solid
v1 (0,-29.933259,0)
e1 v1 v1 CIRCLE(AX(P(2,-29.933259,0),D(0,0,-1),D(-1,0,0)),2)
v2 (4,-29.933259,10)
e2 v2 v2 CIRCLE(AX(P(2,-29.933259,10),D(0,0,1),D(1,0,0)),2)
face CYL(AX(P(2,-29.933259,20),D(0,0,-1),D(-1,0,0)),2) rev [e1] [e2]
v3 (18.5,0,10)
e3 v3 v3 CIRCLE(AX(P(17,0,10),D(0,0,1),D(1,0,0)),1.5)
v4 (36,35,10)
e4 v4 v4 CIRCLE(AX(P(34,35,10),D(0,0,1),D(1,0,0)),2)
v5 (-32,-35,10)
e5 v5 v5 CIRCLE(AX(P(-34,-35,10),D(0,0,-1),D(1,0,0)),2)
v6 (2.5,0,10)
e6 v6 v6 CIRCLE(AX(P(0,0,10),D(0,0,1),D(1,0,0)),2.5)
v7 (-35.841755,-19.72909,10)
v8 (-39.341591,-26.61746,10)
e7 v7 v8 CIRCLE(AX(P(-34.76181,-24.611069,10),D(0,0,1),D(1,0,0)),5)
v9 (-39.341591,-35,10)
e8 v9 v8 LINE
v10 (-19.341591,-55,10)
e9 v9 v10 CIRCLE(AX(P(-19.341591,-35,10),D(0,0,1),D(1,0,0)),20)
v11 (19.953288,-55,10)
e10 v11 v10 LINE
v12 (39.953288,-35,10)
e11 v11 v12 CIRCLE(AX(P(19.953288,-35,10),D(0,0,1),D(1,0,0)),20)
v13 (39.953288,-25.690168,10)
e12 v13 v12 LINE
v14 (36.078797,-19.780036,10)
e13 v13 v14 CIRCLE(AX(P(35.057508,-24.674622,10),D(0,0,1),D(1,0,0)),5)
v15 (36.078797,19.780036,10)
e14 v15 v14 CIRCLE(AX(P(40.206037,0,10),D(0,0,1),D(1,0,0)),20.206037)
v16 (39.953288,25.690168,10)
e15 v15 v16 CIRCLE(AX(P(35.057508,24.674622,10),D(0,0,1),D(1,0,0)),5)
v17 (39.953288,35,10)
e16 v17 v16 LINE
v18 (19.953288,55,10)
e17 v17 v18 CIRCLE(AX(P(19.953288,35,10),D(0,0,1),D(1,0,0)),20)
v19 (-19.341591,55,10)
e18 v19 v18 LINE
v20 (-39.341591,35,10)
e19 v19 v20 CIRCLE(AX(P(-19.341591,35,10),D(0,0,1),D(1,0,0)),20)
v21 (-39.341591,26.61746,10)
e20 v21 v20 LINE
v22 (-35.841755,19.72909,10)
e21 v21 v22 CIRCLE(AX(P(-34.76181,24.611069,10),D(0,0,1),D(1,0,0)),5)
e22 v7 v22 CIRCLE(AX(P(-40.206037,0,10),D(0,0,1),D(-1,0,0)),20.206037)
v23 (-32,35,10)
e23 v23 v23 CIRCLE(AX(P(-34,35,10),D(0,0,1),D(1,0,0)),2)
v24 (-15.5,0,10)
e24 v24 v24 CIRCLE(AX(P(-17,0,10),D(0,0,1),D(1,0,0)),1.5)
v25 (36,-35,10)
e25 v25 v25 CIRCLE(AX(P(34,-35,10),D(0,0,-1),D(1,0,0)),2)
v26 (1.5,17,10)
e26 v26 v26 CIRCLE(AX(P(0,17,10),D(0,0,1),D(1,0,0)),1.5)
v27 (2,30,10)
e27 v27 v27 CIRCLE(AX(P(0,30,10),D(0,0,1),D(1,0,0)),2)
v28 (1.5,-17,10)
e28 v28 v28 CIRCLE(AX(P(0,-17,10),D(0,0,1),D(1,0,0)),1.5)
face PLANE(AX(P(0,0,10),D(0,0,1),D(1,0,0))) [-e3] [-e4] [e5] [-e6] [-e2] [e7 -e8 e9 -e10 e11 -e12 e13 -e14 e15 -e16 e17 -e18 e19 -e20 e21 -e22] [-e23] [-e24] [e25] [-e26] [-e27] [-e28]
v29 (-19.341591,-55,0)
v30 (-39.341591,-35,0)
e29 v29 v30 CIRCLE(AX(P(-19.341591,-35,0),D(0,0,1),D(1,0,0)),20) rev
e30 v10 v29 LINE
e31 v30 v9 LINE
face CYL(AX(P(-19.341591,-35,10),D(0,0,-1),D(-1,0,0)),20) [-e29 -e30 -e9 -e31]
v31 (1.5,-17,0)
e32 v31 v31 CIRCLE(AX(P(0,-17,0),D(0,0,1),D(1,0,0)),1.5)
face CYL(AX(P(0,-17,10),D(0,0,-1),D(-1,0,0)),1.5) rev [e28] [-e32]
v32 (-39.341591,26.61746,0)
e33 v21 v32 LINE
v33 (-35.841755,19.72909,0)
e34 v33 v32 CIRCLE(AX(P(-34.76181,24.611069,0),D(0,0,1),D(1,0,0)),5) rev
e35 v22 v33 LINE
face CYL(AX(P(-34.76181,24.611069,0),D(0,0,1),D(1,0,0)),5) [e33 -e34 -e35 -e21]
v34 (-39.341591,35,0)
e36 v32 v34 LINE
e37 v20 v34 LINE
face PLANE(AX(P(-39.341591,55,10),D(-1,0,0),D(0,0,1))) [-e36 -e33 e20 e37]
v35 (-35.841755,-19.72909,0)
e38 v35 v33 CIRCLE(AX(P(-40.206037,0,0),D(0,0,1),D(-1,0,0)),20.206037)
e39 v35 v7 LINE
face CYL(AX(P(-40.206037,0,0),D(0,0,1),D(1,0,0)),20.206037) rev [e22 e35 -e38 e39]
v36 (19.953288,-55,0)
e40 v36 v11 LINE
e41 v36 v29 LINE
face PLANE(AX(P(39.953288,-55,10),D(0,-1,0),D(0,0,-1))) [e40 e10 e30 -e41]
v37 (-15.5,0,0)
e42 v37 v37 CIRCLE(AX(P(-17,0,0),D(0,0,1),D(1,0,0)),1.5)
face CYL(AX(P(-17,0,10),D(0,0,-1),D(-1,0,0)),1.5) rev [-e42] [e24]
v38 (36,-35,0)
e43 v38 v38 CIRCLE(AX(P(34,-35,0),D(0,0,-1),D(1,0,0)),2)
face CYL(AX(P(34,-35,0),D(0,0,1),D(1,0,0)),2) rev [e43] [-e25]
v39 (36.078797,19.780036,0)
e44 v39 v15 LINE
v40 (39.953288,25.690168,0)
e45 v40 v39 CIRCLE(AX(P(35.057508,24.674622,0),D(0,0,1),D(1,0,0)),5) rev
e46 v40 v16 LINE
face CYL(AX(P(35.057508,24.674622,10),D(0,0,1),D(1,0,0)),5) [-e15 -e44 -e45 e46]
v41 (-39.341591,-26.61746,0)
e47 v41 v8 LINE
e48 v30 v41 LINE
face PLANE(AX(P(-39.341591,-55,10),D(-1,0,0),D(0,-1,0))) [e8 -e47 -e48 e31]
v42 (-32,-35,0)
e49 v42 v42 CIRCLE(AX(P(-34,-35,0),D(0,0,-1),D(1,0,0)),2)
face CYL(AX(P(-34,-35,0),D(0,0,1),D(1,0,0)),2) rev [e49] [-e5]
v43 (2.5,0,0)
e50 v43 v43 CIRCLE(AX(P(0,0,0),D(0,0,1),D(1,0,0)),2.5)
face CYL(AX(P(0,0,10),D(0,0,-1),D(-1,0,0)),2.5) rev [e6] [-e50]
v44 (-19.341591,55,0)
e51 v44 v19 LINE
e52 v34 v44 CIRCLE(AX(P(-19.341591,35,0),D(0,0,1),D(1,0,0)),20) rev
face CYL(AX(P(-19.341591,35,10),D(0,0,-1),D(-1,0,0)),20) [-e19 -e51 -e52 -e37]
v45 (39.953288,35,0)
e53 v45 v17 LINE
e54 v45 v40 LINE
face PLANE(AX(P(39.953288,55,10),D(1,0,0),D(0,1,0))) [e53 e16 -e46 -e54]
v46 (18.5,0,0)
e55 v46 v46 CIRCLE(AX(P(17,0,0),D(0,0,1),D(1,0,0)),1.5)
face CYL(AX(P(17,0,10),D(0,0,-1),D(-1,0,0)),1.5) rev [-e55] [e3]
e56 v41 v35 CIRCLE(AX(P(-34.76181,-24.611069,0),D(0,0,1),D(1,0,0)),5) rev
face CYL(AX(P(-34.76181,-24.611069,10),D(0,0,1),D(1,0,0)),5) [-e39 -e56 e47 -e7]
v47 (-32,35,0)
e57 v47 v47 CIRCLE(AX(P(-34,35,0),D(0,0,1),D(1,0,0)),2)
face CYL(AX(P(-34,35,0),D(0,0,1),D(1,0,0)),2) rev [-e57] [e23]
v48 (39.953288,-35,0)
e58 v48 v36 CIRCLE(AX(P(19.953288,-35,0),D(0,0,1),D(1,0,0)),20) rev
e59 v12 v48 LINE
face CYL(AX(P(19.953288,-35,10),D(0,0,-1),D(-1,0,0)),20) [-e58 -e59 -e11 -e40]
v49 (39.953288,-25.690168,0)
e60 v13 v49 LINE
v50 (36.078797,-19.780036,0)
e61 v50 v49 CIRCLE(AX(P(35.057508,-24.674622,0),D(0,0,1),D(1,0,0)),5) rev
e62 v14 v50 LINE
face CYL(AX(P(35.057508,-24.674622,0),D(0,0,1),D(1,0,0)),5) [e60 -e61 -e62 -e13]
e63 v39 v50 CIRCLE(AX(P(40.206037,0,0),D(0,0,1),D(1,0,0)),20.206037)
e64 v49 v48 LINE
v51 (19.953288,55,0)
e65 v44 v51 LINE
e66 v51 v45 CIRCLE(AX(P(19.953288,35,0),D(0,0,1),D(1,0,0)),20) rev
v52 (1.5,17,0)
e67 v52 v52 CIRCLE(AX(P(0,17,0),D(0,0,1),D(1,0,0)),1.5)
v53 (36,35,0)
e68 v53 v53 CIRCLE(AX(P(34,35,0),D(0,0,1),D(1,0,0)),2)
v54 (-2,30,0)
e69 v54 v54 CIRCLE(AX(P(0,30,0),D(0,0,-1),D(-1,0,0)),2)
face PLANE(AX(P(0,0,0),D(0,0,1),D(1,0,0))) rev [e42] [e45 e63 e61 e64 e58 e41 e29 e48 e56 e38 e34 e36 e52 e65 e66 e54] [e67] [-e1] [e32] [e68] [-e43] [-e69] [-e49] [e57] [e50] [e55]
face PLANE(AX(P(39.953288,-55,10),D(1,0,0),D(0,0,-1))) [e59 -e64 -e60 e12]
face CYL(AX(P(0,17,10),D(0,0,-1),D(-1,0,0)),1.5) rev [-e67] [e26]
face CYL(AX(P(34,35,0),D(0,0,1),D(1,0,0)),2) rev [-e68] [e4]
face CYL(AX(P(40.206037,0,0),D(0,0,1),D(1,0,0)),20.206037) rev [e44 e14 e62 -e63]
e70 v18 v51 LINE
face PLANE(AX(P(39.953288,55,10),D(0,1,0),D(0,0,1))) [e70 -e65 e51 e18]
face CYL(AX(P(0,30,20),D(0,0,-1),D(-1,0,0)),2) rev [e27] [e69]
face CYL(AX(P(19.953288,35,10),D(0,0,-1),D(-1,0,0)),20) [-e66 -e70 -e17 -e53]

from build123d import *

# Parameters (mm, degrees)
SKETCH1_R           = 47.5
SKETCH1_R_2         = 2.5
SKETCH1_R_3         = 1.5
BOSS_EXTRUDE1_DEPTH = 10
SKETCH7_W           = 79.294879448
SKETCH7_H           = 30
BOSS_EXTRUDE3_DEPTH = 10
SKETCH3_R           = 2
CUT_EXTRUDE1_DEPTH  = 10
CUT_EXTRUDE2_START  = -10
CUT_EXTRUDE2_DEPTH  = 10
FILLET2_R           = 5
FILLET3_R           = 20
SKETCH8_R           = 2
CUT_EXTRUDE3_DEPTH  = 20


with BuildPart() as part:
    # Sketch1 → Boss-Extrude1 (new body)
    with BuildSketch(Plane.XY):
        Circle(SKETCH1_R)
        Circle(SKETCH1_R_2, mode=Mode.SUBTRACT)
        with Locations((0, 17)):
            Circle(SKETCH1_R_3, mode=Mode.SUBTRACT)
        with Locations((17, 0)):
            Circle(SKETCH1_R_3, mode=Mode.SUBTRACT)
        with Locations((0, -17)):
            Circle(SKETCH1_R_3, mode=Mode.SUBTRACT)
        with Locations((-17, 0)):
            Circle(SKETCH1_R_3, mode=Mode.SUBTRACT)
    extrude(amount=BOSS_EXTRUDE1_DEPTH)

    # Sketch7 → Boss-Extrude3 (add)
    with BuildSketch(Plane(origin=(0, 0, 0), x_dir=(-1, 0, 0), z_dir=(0, 0, -1))):
        with Locations((-0.305848536, 40)):
            Rectangle(SKETCH7_W, SKETCH7_H)
        with Locations((-0.305848536, -40)):
            Rectangle(SKETCH7_W, SKETCH7_H)
    extrude(amount=-BOSS_EXTRUDE3_DEPTH)

    # Sketch3 → Cut-Extrude1 (cut)
    with BuildSketch(Plane.XY.offset(10)):
        with Locations((-34, 35)):
            Circle(SKETCH3_R)
        with Locations((34, 35)):
            Circle(SKETCH3_R)
    cut_extrude1 = extrude(amount=-CUT_EXTRUDE1_DEPTH, mode=Mode.SUBTRACT)

    # Mirror1: Cut-Extrude1 across plane
    add(cut_extrude1.mirror(Plane.ZX), mode=Mode.SUBTRACT)

    # Sketch4 → Cut-Extrude2 (cut)
    with BuildSketch(Plane.XY.offset(10).offset(CUT_EXTRUDE2_START)):
        with BuildLine():
            ThreePointArc((-43.084219849, 20), (-47.5, 0), (-43.084219849, -20))
            ThreePointArc((-43.084219849, -20), (-20, 0), (-43.084219849, 20))
        make_face()
        with BuildLine():
            ThreePointArc((43.084219849, 20), (47.5, 0), (43.084219849, -20))
            ThreePointArc((43.084219849, -20), (20, 0), (43.084219849, 20))
        make_face()
    extrude(amount=CUT_EXTRUDE2_DEPTH, mode=Mode.SUBTRACT)

    # Fillet2
    # the kernel refuses this fillet: 5 mm, written as the material it takes off along each edge
    with BuildSketch(Plane(origin=(43.084219849, -20, -17.522188683), x_dir=(-0.4820770193525399, -0.8761288417876509, 0), z_dir=(0, 0, 1))) as fillet2_piece_1:
        with BuildLine():
            CenterArc((7.965064209, -4.7789061), FILLET2_R, 107.102298128, 89.932791817)
            Line((3.18443662, -6.243692723), (3.088824068, -6.272988455))
            ThreePointArc((3.088824068, -6.272988455), (1.775921643, -3.02815315), (-0.079852724, -0.060195867))
            Line((-0.079852724, -0.060195867), (-0.006836496, 0.099766038))
            ThreePointArc((-0.006836496, 0.099766038), (3.24733545, 0.211131977), (6.465263034, 0.095578122))
            Line((6.465263034, 0.095578122), (6.4946709, 0))
        make_face()
    extrude(amount=45.044377366, mode=Mode.SUBTRACT)
    with BuildSketch(Plane(origin=(43.084219849, 20, -17.522188683), x_dir=(-0.9995074123131517, -0.03138363795144594, 0), z_dir=(0, 0, 1))) as fillet2_piece_2:
        with BuildLine():
            CenterArc((7.876051386, -4.92422643), FILLET2_R, 99.987608256, 89.932791817)
            Line((2.950811143, -5.78562561), (2.852306338, -5.802853594))
            ThreePointArc((2.852306338, -5.802853594), (1.28732359, -2.988739235), (-0.091980358, -0.039237913))
            Line((-0.091980358, -0.039237913), (0.017343518, 0.098484529))
            ThreePointArc((0.017343518, 0.098484529), (3.504437737, -0.206216713), (6.991531955, 0.098484529))
            Line((6.991531955, 0.098484529), (7.008875473, 0))
        make_face()
    extrude(amount=45.044377366, mode=Mode.SUBTRACT)
    with BuildSketch(Plane(origin=(-43.084219849, 20, -19.006257622), x_dir=(0.9993011358017984, -0.037379673423339595, 0), z_dir=(0, 0, 1))) as fillet2_piece_3:
        with BuildLine():
            CenterArc((8.144232965, 4.918935136), FILLET2_R, 158.484077447, 101.184563019)
            Line((3.49265456, 6.752734019), (3.399622992, 6.789409997))
            ThreePointArc((3.399622992, 6.789409997), (1.522188613, 3.492296192), (-0.092214112, 0.038685366))
            Line((-0.092214112, 0.038685366), (0.01793407, -0.098378703))
            ThreePointArc((0.01793407, -0.098378703), (3.623764745, 0.227599929), (7.22959542, -0.098378703))
            Line((7.22959542, -0.098378703), (7.247529489, 0))
        make_face()
    extrude(amount=48.012515244, mode=Mode.SUBTRACT)
    with BuildSketch(Plane(origin=(-43.084219849, -20, -19.006257622), x_dir=(0.4922890050047702, -0.8704318098228104, 0), z_dir=(0, 0, 1))) as fillet2_piece_4:
        with BuildLine():
            CenterArc((8.110651537, 4.97411149), FILLET2_R, 162.982413534, 101.184563019)
            Line((3.329576688, 6.437437594), (3.233955191, 6.466704116))
            ThreePointArc((3.233955191, 6.466704116), (1.866948313, 3.114157454), (-0.079143369, 0.061125503))
            Line((-0.079143369, 0.061125503), (-0.008002635, -0.099679275))
            ThreePointArc((-0.008002635, -0.099679275), (3.801251524, -0.252344442), (7.592340079, -0.09948223))
            Line((7.592340079, -0.09948223), (7.602503049, 0))
        make_face()
    extrude(amount=48.012515244, mode=Mode.SUBTRACT)

    # Fillet3
    fillet3_edges = [part.edges().sort_by_distance(p)[0] for p in [
        (-39.341591188, 55, 5),
        (39.95328826, 55, 5),
        (39.95328826, -55, 5),
        (-39.341591188, -55, 5),
    ]]
    fillet(fillet3_edges, radius=FILLET3_R)

    # Sketch8 → Cut-Extrude3 (cut)
    with BuildSketch(Plane(origin=(0, 0, 0), x_dir=(-1, 0, 0), z_dir=(0, 0, -1))):
        with Locations((0, 30)):
            Circle(SKETCH8_R)
        with Locations((-2, -29.933259094)):
            Circle(SKETCH8_R)
    extrude(amount=-CUT_EXTRUDE3_DEPTH, mode=Mode.SUBTRACT)


solid = part.part
